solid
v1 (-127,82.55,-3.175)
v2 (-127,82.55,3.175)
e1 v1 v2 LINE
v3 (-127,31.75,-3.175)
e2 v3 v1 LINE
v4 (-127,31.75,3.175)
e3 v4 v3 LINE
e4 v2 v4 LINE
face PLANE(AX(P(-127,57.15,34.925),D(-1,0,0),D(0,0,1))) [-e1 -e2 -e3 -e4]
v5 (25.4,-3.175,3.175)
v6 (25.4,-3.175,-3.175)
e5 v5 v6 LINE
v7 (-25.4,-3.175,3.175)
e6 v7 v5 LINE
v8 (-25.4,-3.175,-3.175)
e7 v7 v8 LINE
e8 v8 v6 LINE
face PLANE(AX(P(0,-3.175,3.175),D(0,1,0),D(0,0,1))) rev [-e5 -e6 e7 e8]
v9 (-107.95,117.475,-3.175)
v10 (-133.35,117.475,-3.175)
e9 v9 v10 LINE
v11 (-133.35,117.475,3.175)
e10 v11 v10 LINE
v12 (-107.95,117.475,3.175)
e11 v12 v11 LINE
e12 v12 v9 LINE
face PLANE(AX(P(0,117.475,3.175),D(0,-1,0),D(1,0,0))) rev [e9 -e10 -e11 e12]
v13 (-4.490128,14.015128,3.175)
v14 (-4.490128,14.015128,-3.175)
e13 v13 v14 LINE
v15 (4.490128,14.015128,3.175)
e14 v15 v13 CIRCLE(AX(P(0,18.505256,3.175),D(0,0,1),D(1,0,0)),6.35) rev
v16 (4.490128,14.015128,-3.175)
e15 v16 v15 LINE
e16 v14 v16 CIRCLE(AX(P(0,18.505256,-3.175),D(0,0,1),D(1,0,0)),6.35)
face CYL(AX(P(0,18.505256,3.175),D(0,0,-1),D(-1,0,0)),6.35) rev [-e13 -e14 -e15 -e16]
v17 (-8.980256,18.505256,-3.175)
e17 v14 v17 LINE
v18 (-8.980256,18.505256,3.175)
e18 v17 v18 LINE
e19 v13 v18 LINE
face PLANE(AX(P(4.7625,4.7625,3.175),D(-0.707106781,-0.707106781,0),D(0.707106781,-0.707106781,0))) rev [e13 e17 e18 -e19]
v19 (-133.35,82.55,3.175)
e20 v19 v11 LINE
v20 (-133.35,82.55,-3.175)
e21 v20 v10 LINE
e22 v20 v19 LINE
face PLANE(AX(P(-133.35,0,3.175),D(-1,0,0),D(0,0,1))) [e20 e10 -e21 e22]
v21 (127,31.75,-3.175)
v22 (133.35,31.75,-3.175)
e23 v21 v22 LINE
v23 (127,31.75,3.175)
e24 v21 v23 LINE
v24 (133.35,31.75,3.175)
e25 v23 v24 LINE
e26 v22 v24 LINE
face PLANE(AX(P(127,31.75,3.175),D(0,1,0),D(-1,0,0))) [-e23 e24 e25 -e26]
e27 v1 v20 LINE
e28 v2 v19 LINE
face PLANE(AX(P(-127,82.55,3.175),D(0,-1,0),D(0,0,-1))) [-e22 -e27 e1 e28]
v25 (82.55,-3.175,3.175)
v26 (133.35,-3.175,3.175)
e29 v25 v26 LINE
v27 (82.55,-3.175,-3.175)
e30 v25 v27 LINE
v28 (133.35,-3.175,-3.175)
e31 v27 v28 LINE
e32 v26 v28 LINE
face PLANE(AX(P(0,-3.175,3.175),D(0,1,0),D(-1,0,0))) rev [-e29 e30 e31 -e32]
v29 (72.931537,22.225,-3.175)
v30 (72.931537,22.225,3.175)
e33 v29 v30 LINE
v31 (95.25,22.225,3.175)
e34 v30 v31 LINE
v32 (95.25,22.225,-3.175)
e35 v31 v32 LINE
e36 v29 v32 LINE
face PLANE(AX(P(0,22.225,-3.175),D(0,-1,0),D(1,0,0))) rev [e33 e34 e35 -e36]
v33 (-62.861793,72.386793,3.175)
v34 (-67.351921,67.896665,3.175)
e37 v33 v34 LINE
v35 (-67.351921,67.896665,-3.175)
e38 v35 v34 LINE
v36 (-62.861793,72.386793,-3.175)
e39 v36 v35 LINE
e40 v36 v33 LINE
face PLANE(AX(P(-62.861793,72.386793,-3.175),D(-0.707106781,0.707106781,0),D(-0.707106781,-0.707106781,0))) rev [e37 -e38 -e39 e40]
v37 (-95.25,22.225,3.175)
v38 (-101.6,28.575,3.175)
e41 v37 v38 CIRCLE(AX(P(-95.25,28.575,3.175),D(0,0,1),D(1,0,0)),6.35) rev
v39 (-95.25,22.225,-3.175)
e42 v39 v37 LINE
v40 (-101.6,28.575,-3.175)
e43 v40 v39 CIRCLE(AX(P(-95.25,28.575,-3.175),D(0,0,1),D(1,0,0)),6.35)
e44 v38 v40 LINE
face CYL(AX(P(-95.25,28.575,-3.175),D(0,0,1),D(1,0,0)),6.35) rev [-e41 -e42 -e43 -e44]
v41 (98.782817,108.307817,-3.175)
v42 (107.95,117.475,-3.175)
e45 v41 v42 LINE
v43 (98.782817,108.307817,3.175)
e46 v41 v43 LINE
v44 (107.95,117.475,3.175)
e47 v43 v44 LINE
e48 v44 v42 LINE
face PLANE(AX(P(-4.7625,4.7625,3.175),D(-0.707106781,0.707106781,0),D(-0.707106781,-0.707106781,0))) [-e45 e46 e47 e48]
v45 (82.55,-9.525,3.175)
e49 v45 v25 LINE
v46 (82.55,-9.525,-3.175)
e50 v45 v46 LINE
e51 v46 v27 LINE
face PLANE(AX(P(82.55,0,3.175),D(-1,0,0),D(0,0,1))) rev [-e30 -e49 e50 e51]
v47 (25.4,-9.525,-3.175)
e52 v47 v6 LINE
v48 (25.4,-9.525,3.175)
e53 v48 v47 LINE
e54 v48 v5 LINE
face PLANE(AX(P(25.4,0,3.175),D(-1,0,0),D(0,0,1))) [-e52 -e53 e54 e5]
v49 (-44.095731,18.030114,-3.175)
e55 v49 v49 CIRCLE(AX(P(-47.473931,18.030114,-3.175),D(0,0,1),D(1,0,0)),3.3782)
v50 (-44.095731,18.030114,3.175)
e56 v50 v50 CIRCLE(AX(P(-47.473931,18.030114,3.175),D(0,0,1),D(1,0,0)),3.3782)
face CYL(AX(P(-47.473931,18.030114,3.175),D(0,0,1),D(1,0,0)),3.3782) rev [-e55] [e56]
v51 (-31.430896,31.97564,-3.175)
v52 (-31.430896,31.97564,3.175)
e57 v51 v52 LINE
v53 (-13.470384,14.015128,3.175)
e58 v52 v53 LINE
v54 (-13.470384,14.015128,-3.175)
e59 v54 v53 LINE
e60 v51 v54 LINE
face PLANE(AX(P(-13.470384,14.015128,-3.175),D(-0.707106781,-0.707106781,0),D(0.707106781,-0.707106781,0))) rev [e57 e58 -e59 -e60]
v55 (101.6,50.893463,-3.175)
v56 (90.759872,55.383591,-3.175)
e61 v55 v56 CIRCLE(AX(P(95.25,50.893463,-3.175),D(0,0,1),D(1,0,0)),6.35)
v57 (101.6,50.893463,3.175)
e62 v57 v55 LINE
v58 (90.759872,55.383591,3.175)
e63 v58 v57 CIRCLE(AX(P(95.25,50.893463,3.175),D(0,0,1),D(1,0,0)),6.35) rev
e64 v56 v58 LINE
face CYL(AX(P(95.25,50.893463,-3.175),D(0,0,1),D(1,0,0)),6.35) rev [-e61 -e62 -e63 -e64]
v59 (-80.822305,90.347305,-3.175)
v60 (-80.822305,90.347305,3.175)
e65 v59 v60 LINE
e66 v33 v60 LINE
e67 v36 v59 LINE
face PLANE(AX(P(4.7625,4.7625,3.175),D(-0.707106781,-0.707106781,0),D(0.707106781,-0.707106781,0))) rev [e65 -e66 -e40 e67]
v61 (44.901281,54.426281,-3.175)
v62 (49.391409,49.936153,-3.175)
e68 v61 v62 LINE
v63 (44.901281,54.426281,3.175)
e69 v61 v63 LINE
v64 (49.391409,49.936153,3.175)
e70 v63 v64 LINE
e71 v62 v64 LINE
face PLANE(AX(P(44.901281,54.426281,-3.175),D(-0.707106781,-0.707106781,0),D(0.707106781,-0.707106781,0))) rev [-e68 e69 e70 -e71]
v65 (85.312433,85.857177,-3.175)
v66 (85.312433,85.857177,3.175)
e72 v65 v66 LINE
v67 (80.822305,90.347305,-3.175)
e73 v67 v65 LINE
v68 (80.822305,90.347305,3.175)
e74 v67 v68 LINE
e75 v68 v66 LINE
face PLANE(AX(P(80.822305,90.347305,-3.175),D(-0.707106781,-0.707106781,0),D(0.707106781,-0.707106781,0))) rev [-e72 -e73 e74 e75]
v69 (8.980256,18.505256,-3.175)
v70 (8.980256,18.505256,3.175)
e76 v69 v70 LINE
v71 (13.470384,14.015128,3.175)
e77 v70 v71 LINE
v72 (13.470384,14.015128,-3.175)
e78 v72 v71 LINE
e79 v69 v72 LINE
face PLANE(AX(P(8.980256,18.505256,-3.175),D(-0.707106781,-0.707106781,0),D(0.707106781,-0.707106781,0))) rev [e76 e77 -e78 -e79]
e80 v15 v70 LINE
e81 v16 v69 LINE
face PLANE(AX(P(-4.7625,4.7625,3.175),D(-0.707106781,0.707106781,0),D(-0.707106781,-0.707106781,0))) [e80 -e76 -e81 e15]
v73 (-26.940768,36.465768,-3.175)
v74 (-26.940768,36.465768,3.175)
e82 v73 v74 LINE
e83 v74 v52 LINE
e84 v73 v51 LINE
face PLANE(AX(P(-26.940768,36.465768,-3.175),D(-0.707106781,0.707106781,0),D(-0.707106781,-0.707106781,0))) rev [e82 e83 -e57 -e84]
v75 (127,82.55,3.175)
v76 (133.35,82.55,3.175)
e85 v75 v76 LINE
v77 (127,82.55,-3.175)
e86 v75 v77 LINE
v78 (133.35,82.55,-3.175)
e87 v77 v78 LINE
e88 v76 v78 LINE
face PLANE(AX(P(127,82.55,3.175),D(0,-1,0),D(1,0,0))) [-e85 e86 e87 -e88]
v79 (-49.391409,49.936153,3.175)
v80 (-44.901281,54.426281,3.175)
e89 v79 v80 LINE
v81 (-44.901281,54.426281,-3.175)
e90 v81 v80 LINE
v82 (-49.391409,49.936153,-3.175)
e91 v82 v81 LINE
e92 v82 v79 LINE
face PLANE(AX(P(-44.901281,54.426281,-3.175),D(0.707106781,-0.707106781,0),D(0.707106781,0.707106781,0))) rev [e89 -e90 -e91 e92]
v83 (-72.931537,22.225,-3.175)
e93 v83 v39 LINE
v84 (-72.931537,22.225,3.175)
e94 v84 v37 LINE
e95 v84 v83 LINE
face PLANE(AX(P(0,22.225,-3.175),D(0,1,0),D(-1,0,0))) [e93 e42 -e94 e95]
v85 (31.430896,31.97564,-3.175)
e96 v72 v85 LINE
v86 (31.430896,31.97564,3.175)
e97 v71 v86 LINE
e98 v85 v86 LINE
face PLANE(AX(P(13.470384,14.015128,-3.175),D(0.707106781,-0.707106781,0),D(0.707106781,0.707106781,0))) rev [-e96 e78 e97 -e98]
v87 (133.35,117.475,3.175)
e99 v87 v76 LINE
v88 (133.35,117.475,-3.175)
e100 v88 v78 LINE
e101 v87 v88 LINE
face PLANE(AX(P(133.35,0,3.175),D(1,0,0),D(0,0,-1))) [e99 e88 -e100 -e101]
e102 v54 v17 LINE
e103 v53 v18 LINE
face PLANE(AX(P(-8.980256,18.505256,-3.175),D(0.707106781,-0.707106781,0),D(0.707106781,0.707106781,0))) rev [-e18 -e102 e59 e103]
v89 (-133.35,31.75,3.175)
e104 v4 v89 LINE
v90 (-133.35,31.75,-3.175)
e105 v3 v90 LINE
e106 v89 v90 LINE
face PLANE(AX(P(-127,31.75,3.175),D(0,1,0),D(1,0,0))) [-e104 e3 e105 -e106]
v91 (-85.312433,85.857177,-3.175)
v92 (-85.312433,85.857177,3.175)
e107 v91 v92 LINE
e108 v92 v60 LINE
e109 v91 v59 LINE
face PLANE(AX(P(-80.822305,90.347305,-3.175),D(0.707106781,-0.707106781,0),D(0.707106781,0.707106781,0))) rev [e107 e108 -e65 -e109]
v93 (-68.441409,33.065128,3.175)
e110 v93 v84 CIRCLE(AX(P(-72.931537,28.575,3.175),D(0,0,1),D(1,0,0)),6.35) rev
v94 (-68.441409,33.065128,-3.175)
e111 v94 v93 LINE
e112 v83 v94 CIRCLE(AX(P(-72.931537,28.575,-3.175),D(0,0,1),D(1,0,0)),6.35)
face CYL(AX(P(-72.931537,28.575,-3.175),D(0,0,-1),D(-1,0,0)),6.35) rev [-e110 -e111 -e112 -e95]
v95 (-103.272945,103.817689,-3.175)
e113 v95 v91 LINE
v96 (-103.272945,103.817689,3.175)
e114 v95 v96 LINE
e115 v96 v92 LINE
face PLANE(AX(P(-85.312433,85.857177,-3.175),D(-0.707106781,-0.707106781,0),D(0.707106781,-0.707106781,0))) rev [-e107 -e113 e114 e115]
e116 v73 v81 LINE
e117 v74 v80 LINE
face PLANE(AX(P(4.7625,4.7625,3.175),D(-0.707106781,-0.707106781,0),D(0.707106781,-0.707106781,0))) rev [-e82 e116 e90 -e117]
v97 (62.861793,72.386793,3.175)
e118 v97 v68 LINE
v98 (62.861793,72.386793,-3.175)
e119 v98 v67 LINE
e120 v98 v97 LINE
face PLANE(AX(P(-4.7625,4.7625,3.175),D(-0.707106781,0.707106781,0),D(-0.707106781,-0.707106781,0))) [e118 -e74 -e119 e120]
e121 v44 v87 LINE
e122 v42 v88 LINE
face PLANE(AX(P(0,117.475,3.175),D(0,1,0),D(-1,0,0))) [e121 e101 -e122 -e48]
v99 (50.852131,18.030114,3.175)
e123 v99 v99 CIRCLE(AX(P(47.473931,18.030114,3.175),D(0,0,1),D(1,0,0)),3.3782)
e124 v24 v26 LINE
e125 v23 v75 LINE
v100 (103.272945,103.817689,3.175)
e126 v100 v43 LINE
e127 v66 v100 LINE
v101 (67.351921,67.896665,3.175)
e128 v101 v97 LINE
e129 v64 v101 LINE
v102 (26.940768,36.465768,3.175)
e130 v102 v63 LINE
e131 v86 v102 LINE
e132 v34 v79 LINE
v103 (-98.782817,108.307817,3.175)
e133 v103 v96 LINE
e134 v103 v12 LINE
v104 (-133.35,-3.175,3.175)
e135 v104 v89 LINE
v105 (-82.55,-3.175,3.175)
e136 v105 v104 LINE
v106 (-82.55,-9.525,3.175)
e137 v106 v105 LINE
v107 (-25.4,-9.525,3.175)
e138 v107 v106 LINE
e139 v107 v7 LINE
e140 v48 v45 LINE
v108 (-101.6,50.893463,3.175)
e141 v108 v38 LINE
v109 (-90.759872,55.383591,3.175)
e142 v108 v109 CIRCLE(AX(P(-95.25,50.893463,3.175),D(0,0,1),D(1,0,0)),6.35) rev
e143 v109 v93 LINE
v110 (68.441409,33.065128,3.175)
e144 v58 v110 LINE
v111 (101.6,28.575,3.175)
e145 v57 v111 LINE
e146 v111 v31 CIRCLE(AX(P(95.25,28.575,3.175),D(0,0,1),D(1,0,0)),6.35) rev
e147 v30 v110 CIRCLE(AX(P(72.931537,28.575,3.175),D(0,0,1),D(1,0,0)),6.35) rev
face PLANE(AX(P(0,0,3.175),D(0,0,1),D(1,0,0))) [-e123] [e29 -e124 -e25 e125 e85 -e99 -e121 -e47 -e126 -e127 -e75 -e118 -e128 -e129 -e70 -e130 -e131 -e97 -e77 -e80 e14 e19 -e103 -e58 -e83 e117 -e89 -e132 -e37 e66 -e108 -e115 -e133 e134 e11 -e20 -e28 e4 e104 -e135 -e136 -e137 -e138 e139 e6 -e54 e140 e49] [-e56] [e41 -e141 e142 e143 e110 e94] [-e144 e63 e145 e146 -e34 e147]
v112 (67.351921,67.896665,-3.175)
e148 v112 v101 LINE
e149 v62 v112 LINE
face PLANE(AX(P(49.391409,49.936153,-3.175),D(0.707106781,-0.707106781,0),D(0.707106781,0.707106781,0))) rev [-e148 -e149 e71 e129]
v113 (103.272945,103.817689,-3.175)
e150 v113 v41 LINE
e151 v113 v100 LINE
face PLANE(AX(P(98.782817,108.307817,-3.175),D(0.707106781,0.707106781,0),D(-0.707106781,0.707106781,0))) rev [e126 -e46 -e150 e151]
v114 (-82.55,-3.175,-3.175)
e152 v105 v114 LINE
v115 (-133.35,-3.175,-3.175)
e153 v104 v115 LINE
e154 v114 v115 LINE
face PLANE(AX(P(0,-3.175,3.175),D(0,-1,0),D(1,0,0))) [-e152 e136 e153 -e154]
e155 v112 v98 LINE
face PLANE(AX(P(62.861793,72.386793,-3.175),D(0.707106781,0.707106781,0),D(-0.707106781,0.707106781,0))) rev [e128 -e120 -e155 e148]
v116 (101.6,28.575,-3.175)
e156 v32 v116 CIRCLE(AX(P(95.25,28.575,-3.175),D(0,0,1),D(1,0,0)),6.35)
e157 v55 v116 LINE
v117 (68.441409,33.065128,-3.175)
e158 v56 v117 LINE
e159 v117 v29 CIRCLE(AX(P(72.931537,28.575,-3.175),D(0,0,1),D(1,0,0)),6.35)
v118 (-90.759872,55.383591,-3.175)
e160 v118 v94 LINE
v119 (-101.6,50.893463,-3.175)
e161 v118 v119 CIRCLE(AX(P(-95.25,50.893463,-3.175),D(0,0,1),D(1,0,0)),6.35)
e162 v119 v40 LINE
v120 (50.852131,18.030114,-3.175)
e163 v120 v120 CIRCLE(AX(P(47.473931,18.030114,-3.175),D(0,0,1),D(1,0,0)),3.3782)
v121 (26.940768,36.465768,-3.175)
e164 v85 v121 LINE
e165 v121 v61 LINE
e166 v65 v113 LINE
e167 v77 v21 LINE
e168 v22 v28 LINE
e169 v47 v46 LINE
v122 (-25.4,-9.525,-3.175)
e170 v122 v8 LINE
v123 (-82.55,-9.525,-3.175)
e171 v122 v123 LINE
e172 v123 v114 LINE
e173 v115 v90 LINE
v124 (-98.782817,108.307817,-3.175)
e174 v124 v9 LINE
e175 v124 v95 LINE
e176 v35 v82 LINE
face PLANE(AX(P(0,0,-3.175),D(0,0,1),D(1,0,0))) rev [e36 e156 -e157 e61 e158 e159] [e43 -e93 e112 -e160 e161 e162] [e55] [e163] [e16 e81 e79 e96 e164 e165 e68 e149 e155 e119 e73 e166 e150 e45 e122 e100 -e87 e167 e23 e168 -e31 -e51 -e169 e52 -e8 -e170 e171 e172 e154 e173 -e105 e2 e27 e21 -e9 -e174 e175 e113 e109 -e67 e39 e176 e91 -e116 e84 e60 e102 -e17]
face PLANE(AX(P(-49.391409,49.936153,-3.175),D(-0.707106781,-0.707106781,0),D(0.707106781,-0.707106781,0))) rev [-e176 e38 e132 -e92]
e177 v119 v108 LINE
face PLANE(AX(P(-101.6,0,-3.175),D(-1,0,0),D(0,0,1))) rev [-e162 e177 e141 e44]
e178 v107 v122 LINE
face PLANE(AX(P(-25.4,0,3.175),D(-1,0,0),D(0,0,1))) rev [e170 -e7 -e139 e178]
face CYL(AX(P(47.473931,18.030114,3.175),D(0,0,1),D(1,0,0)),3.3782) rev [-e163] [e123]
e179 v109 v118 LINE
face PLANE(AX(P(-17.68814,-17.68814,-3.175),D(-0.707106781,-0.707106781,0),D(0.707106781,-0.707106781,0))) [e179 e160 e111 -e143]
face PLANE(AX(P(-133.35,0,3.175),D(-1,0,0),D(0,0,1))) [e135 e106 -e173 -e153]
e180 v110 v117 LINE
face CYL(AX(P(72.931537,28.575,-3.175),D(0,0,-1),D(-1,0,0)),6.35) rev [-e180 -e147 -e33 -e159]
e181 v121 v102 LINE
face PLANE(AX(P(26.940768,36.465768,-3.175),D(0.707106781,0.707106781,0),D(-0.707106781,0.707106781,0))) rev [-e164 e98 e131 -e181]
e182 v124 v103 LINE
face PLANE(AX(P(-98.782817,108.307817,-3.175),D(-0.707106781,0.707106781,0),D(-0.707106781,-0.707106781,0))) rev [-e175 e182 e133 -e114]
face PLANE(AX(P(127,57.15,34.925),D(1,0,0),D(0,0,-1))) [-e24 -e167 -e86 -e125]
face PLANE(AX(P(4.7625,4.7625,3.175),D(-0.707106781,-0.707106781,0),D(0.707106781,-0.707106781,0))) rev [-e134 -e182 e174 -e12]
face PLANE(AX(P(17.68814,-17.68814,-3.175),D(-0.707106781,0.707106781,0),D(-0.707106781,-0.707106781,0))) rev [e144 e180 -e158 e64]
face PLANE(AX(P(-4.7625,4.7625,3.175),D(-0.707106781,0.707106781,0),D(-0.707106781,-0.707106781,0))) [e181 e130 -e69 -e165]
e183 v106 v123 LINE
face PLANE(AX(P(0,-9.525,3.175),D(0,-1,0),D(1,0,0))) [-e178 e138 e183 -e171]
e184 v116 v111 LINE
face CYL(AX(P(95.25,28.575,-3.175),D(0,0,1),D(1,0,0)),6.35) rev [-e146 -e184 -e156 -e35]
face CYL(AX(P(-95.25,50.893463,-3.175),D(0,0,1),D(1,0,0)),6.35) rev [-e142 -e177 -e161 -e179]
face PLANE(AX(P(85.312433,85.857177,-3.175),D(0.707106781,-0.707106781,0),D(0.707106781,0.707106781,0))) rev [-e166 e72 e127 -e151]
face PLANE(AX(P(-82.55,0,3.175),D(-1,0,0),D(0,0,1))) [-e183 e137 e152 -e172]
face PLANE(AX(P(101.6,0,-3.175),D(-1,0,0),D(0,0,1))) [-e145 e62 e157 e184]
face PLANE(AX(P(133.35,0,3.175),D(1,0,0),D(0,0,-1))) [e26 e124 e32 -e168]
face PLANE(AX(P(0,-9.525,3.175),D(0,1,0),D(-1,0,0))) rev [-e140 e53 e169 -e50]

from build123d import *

# Parameters (mm, degrees)
BOSS_EXTRUDE1_DEPTH     = 3.175
CUT_EXTRUDE1_DEPTH      = 178.828345955
CAVITY1_START           = 31.75
CAVITY1_OUTLINE_W       = 6.35
CAVITY1_OUTLINE_H       = 6.35
CAVITY1_DEPTH           = 50.8
FILLET1_R               = 6.35
CUT_EXTRUDE2_DEPTH      = 178.828345955
FILLET2_R               = 6.35
F_1_4_CLEARANCE_HOLE1_D = 6.7564


# Read off the part's stored shape, not the designer's step: Cavity1
with BuildPart() as part:
    # Sketch1 → Boss-Extrude1 (new, symmetric)
    with BuildSketch(Plane.XY):
        Polygon((133.35, -3.175), (133.35, 117.475), (107.95, 117.475), (0, 9.525), (-107.95, 117.475), (-133.35, 117.475), (-133.35, -3.175), (-82.55, -3.175), (-82.55, -9.525), (-25.4, -9.525), (-25.4, -3.175), (25.4, -3.175), (25.4, -9.525), (82.55, -9.525), (82.55, -3.175), align=None)
    extrude(amount=BOSS_EXTRUDE1_DEPTH, both=True)

    # Sketch2 → Cut-Extrude1 (cut, through all)
    with BuildSketch(Plane.XY.offset(3.175)):
        Polygon((-8.980256121, 18.505256121), (-13.470384182, 14.015128061), (-31.430896424, 31.975640303), (-26.940768363, 36.465768363), align=None)
        Polygon((-62.861792847, 72.386792847), (-67.351920908, 67.896664787), (-49.391408666, 49.936152545), (-44.901280605, 54.426280605), align=None)
        Polygon((-98.782817332, 108.307817332), (-103.272945392, 103.817689271), (-85.31243315, 85.857177029), (-80.82230509, 90.34730509), align=None)
        Polygon((80.82230509, 90.34730509), (98.782817332, 108.307817332), (103.272945392, 103.817689271), (85.31243315, 85.857177029), align=None)
        Polygon((44.901280605, 54.426280605), (62.861792847, 72.386792847), (67.351920908, 67.896664787), (49.391408666, 49.936152545), align=None)
        Polygon((26.940768363, 36.465768363), (31.430896424, 31.975640303), (13.470384182, 14.015128061), (8.980256121, 18.505256121), align=None)
    extrude(amount=-CUT_EXTRUDE1_DEPTH, mode=Mode.SUBTRACT)

    # Cavity1 outline → Cavity1 (cut)
    with BuildSketch(Plane(origin=(0, 0, 0), x_dir=(1, 0, 0), z_dir=(0, 1, 0)).offset(CAVITY1_START)):
        with Locations((130.175, 0)):
            Rectangle(CAVITY1_OUTLINE_W, CAVITY1_OUTLINE_H)
        with Locations((-130.175, 0)):
            Rectangle(CAVITY1_OUTLINE_W, CAVITY1_OUTLINE_H)
    extrude(amount=CAVITY1_DEPTH, mode=Mode.SUBTRACT)

    # Fillet1
    fillet1_edges = [part.edges().sort_by_distance(p)[0] for p in [
        (0, 9.525, 0),
    ]]
    fillet(fillet1_edges, radius=FILLET1_R)

    # Sketch3 → Cut-Extrude2 (cut, through all)
    with BuildSketch(Plane.XY.offset(3.175)):
        Polygon((-101.6, 66.223719395), (-57.601280605, 22.225), (-101.6, 22.225), (-101.6, 31.75), align=None)
    cut_extrude2 = extrude(amount=-CUT_EXTRUDE2_DEPTH, mode=Mode.SUBTRACT)

    # Mirror1: Cut-Extrude2 across plane
    add(cut_extrude2.mirror(Plane(origin=(0, 0, 0), x_dir=(0, 0, 1), z_dir=(1, 0, 0))), mode=Mode.SUBTRACT)

    # Fillet2
    fillet2_edges = [part.edges().sort_by_distance(p)[0] for p in [
        (-57.601280605, 22.225, 0),
        (-101.6, 22.225, 0),
        (-101.6, 66.223719395, 0),
        (101.6, 22.225, 0),
        (57.601280605, 22.225, 0),
        (101.6, 66.223719395, 0),
    ]]
    fillet(fillet2_edges, radius=FILLET2_R)

    # 1/4 Clearance Hole1 (through all)
    with Locations(Plane.XY.offset(3.175)):
        with Locations((-47.473930622, 18.030114286)):
            f_1_4_clearance_hole1 = Hole(F_1_4_CLEARANCE_HOLE1_D / 2)

    # Mirror2: 1/4 Clearance Hole1 across plane
    add(f_1_4_clearance_hole1.mirror(Plane(origin=(0, 0, 0), x_dir=(0, 0, 1), z_dir=(1, 0, 0))), mode=Mode.SUBTRACT)


solid = part.part
